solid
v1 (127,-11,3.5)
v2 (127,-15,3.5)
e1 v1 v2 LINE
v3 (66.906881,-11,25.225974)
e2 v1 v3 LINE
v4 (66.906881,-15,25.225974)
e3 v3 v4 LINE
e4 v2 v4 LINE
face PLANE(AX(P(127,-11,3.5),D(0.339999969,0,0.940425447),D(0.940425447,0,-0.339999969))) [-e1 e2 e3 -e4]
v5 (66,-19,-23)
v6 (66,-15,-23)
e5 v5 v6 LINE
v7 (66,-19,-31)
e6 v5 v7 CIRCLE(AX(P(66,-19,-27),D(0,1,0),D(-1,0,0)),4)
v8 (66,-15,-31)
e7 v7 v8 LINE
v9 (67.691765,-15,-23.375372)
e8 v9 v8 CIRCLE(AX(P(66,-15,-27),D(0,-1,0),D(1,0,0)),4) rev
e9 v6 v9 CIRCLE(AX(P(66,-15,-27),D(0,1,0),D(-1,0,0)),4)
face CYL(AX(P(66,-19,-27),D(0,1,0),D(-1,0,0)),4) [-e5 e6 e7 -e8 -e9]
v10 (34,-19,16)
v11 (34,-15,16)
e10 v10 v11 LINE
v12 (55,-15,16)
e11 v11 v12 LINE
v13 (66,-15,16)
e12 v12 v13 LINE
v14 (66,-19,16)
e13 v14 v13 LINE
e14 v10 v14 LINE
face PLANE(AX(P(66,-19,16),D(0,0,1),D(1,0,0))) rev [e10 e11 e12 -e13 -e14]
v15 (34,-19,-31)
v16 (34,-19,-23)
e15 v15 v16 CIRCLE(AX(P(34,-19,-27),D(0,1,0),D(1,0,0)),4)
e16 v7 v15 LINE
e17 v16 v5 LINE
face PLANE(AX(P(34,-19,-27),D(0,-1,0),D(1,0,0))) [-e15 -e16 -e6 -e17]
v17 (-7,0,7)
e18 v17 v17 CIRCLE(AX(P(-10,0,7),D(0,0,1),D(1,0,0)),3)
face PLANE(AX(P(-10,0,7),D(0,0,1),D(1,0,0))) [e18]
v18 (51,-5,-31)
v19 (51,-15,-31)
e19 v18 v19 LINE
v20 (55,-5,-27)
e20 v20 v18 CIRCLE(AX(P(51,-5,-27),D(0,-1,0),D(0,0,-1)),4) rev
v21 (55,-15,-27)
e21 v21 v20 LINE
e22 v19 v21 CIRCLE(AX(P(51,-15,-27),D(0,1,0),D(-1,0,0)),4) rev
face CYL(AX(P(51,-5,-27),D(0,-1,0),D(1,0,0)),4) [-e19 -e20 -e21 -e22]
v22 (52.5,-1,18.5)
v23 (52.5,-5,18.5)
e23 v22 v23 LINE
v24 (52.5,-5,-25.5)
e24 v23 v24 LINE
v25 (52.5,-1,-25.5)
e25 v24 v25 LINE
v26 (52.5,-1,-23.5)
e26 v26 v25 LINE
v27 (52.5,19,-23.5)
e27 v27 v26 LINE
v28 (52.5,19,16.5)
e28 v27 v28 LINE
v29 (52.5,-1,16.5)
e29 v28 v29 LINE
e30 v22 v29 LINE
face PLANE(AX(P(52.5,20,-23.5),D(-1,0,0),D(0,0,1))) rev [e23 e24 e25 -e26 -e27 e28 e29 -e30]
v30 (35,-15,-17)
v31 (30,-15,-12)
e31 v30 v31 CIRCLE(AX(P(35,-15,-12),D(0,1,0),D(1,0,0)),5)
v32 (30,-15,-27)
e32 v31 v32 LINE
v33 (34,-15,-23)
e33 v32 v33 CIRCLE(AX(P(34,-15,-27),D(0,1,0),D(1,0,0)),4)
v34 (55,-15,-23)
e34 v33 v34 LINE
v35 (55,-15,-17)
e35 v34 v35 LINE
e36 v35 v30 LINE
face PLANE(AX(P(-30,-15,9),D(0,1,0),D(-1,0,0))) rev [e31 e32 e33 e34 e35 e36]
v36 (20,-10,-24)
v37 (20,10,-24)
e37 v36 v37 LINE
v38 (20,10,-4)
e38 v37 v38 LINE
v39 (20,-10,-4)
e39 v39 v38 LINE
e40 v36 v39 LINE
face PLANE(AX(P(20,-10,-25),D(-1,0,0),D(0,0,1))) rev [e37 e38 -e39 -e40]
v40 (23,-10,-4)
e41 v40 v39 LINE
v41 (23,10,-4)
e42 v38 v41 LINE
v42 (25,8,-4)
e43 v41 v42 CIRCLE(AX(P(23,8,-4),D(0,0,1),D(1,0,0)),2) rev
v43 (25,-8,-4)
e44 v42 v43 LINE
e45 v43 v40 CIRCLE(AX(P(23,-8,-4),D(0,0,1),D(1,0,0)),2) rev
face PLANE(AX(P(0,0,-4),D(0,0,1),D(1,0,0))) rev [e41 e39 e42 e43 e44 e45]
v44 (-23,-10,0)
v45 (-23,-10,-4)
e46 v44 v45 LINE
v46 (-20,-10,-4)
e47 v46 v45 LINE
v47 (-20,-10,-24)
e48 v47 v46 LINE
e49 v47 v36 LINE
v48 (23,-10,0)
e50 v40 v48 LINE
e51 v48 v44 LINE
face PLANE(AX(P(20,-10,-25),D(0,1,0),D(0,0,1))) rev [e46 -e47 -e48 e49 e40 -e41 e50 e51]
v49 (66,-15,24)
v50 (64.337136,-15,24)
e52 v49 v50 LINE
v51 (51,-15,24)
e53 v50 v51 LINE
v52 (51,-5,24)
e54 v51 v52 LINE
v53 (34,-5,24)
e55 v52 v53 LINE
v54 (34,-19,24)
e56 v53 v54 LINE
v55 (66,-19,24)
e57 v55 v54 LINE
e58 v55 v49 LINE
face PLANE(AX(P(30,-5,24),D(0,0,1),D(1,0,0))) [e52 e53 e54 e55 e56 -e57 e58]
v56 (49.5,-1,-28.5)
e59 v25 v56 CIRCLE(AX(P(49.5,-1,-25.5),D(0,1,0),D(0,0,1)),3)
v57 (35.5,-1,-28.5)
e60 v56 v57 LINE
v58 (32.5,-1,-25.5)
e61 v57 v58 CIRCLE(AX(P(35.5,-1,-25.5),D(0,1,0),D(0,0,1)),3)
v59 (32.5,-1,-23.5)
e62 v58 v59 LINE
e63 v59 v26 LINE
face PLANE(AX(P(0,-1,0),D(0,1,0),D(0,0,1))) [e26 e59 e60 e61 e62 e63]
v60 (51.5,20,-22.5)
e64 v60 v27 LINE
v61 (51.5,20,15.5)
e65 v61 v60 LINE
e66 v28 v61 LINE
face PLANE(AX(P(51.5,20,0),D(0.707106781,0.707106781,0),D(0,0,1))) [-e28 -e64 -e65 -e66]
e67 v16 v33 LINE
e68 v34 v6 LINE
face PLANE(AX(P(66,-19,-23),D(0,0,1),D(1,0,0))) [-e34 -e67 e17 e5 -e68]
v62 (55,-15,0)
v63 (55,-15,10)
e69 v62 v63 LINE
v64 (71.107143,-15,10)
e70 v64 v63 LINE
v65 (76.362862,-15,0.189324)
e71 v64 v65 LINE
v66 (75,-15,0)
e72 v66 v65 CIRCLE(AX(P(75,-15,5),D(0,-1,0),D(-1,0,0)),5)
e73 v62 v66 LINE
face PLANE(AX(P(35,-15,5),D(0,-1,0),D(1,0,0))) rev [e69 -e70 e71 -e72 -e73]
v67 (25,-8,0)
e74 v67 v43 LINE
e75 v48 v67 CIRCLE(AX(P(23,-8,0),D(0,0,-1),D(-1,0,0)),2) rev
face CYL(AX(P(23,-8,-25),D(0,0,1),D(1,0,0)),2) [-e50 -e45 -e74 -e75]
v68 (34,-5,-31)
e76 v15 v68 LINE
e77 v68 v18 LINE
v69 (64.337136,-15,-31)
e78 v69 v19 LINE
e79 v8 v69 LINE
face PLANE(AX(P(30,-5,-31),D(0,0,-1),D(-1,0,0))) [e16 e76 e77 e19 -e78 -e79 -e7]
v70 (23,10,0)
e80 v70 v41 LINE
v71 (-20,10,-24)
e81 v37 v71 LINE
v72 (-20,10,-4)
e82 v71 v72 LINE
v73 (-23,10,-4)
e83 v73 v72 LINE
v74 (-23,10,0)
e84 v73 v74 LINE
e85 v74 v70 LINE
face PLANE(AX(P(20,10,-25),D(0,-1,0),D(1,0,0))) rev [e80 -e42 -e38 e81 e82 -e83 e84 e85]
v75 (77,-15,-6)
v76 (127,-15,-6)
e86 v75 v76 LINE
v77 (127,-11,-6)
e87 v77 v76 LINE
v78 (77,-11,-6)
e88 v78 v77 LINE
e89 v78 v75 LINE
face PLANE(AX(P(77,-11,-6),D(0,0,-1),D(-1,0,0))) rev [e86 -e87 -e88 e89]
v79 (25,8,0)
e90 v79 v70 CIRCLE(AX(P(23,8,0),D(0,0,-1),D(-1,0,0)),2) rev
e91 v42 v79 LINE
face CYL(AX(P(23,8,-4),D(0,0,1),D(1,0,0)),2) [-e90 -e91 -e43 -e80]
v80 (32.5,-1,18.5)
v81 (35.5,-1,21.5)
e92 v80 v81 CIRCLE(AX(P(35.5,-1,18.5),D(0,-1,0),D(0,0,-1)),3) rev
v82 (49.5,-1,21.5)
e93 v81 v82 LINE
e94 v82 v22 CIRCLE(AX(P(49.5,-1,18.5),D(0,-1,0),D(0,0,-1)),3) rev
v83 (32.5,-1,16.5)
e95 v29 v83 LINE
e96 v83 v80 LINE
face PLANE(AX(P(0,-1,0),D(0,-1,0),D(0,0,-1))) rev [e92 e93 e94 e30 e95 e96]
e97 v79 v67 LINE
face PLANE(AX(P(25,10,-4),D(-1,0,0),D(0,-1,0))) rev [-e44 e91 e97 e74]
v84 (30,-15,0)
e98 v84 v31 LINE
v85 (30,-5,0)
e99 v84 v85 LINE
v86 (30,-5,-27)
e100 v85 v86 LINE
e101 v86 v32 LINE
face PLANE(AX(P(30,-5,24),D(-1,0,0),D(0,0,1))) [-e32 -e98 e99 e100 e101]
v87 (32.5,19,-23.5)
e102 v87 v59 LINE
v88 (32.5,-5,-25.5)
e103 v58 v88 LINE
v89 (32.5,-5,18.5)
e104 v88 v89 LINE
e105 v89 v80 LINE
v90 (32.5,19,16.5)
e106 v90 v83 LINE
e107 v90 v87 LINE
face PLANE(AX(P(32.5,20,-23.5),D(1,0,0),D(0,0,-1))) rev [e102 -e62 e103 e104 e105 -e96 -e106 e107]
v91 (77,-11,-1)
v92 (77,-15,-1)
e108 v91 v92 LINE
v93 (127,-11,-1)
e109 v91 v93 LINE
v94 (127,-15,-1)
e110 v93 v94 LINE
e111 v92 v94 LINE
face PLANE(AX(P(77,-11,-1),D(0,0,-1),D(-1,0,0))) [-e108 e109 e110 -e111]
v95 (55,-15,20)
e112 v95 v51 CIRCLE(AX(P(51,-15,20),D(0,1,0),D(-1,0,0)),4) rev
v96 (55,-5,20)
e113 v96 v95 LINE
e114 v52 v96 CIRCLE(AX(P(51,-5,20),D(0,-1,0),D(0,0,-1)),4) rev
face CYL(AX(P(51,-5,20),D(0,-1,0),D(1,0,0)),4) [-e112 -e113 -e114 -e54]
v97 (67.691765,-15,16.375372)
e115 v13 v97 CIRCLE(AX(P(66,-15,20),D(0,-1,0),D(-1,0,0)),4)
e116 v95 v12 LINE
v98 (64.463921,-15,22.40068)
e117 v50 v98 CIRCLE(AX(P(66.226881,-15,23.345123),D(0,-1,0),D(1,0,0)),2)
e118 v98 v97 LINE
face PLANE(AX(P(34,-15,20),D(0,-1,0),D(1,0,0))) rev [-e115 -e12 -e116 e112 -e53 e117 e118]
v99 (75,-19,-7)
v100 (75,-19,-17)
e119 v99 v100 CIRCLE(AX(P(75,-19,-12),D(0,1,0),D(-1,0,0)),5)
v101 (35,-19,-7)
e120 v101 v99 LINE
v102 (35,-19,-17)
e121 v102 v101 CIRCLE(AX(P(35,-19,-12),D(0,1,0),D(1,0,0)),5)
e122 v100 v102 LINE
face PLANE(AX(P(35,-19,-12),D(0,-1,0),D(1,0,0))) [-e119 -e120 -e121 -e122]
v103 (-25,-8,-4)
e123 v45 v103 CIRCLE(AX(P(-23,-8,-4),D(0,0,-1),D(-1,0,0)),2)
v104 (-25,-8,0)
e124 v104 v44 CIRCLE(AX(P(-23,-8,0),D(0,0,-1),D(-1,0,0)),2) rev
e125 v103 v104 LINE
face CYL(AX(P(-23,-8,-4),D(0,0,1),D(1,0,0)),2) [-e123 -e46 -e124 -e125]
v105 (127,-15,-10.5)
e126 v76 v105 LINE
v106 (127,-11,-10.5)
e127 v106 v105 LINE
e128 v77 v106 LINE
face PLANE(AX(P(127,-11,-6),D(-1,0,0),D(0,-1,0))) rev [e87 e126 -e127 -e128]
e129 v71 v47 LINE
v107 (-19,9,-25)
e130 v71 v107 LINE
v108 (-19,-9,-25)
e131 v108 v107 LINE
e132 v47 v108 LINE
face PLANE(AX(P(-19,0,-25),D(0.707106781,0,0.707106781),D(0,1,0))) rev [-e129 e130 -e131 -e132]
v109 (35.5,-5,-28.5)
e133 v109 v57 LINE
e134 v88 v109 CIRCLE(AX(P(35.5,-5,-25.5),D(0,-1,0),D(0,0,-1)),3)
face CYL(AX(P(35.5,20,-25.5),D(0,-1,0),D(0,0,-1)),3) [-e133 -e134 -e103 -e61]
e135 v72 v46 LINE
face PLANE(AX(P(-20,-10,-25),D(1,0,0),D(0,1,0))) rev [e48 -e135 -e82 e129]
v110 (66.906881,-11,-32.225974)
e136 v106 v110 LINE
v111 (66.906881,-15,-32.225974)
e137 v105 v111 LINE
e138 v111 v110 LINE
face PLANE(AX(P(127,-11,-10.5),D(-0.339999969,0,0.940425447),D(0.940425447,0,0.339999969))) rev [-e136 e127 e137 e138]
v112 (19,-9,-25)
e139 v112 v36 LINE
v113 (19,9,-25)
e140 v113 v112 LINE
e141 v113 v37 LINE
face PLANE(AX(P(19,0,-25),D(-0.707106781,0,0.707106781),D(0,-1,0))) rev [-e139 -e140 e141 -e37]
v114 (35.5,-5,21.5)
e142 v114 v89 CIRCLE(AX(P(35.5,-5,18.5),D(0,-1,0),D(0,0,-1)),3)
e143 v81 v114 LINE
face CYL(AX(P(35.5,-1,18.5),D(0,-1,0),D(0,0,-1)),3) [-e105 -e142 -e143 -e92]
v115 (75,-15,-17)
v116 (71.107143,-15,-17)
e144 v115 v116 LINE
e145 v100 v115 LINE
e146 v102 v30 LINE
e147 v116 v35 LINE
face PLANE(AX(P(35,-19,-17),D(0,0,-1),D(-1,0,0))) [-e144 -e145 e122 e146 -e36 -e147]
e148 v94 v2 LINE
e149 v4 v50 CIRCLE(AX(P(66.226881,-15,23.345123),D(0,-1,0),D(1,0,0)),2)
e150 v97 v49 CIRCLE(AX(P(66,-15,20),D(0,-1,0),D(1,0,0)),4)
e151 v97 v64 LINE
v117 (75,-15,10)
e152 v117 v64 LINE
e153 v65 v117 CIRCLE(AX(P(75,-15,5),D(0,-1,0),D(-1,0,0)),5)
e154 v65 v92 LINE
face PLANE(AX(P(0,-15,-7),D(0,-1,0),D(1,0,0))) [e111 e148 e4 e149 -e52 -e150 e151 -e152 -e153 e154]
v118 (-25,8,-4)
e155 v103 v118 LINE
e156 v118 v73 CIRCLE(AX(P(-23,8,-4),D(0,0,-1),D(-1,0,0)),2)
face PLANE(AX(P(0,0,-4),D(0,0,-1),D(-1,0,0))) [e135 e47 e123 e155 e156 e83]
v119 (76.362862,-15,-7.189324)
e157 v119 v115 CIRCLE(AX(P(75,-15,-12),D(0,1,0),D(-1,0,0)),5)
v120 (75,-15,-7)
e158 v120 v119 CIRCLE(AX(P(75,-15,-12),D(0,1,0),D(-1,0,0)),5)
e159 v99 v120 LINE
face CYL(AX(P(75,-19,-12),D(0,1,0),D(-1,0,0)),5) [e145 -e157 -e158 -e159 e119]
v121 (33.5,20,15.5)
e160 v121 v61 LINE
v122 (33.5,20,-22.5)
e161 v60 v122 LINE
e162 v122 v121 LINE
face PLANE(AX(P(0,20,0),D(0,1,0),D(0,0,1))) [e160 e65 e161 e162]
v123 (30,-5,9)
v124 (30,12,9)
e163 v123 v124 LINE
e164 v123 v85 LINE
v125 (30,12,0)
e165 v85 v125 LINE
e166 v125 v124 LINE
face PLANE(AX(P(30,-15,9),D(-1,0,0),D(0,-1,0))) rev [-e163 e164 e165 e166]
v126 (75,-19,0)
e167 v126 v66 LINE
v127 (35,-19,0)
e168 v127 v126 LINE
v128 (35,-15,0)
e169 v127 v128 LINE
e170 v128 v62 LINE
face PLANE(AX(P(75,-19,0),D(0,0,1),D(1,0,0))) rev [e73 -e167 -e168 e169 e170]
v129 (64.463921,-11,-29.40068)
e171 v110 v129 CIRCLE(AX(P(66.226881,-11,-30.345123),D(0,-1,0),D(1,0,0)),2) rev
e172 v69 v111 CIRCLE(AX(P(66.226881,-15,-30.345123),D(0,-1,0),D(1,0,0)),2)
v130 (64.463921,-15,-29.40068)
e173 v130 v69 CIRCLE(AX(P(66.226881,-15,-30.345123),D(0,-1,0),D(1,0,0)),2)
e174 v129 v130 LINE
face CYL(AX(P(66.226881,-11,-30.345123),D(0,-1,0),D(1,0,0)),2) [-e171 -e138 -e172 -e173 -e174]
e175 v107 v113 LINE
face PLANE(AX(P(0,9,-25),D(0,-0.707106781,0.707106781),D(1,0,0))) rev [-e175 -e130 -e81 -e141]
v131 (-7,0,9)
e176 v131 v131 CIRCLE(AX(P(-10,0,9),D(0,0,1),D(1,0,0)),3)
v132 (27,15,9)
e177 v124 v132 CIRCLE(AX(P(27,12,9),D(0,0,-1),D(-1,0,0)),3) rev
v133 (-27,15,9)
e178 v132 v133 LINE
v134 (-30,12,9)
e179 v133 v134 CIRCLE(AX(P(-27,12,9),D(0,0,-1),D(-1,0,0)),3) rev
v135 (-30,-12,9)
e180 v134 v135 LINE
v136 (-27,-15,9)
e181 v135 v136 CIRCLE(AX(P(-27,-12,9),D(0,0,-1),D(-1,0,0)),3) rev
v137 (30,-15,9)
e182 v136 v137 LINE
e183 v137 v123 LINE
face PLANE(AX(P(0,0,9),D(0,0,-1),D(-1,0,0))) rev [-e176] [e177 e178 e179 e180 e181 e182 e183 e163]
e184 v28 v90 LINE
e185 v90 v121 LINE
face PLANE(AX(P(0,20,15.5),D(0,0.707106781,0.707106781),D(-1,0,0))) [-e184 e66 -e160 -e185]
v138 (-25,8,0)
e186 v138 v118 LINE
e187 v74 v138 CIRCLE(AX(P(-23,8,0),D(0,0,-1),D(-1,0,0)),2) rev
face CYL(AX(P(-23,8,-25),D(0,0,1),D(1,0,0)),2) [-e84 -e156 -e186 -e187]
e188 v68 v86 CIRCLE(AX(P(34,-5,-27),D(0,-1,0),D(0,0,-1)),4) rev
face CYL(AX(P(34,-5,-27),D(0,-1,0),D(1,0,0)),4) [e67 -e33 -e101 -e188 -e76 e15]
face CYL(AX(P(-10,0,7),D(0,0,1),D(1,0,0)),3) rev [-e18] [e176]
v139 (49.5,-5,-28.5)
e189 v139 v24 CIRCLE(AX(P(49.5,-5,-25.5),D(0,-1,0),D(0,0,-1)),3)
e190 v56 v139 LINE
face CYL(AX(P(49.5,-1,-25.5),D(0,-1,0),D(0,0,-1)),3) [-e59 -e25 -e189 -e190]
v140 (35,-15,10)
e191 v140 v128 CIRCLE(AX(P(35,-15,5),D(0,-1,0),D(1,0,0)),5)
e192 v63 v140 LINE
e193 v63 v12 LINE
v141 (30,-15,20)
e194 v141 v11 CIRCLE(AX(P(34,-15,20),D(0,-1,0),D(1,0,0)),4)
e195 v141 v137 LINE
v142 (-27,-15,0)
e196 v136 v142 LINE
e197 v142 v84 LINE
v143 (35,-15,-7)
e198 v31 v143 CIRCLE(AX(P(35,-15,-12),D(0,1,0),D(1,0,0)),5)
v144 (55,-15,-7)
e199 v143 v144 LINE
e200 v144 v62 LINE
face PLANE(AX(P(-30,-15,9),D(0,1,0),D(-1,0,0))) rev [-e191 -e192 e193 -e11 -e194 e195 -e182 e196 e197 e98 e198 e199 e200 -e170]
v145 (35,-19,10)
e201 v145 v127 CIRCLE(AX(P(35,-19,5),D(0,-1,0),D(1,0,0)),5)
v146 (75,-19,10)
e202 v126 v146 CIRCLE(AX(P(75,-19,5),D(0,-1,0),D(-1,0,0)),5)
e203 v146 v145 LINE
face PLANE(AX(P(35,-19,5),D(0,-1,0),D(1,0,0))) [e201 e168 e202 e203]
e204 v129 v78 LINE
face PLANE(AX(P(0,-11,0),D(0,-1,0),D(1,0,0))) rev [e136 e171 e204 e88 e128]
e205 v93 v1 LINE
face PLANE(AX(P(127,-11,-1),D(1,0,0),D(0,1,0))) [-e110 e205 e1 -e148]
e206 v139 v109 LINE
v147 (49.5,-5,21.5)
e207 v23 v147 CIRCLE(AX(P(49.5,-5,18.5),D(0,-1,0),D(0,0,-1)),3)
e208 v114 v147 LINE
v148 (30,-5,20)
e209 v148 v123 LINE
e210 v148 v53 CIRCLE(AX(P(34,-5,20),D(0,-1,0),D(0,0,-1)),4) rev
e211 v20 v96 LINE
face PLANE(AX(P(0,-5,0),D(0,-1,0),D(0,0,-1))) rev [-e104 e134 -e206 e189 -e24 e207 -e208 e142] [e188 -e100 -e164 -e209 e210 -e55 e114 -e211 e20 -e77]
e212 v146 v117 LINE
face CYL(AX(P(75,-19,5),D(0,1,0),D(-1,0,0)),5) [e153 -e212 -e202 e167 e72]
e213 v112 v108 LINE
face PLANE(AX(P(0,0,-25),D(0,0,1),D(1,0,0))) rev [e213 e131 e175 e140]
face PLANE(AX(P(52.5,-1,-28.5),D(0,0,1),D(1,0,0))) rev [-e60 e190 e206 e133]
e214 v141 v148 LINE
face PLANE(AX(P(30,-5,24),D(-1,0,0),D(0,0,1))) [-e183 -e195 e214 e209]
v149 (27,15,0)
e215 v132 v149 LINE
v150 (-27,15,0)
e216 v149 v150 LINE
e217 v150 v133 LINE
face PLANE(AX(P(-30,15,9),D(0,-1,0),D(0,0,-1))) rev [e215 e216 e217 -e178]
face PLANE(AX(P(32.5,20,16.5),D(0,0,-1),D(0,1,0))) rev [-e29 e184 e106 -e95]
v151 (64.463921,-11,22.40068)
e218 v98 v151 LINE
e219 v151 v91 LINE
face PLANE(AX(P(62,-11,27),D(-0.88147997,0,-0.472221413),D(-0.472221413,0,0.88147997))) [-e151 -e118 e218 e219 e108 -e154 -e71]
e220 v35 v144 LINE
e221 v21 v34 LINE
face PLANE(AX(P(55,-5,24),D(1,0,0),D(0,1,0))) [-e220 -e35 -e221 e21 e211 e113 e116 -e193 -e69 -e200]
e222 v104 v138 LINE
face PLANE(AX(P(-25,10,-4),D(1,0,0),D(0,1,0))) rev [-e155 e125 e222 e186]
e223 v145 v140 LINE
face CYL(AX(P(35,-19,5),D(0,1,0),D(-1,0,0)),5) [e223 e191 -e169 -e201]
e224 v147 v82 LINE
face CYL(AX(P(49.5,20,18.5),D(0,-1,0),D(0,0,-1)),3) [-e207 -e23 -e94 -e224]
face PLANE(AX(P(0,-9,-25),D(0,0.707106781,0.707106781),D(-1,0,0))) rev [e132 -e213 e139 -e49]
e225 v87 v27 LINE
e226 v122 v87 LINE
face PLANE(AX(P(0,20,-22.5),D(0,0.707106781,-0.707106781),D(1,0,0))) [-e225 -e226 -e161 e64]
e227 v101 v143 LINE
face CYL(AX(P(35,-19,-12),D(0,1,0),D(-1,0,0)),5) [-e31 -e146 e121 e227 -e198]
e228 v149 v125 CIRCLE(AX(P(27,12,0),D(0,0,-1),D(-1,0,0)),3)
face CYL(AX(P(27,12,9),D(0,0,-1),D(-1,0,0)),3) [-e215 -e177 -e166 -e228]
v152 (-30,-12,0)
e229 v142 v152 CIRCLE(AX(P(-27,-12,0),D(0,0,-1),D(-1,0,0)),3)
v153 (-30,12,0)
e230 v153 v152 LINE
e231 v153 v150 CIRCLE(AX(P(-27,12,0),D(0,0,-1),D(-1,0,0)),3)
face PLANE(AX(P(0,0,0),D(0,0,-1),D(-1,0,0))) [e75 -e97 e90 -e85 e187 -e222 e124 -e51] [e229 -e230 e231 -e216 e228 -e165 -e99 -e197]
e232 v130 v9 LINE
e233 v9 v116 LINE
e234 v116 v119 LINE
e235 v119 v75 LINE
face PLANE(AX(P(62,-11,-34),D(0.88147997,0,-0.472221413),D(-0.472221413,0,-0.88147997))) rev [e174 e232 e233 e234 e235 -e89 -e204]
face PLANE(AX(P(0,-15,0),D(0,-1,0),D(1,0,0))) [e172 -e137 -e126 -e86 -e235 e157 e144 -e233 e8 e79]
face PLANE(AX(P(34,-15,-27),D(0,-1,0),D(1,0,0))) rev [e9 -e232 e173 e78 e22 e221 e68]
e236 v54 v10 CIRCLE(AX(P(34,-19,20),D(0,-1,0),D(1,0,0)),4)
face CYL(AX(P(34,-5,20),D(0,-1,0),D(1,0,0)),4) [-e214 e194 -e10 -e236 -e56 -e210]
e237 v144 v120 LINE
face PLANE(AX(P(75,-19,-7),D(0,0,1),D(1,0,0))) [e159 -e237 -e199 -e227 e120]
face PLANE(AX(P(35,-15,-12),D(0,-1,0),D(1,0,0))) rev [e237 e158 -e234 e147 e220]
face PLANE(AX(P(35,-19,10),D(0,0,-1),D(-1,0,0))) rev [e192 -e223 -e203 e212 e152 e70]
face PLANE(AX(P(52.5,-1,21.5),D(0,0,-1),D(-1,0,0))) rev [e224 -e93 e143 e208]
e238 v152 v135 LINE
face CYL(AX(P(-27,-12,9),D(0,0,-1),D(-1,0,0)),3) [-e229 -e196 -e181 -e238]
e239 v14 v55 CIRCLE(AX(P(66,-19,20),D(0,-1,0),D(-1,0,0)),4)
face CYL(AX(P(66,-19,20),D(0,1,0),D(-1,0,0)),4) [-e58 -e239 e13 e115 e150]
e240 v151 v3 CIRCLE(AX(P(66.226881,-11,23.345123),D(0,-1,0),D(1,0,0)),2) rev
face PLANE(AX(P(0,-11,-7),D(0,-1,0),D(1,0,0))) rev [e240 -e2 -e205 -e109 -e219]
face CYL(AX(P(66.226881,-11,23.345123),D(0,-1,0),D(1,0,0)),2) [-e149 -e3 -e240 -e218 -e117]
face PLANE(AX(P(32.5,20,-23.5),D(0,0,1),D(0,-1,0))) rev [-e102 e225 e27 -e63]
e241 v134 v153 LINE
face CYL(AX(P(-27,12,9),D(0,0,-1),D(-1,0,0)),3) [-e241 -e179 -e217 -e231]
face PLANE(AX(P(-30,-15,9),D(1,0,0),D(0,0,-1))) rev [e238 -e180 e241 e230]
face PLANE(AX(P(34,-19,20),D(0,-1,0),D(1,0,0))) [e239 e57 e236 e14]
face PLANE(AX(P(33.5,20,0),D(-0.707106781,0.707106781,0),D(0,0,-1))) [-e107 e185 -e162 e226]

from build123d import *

# Parameters (mm, degrees)
SKETCH_1_W          = 60
SKETCH_1_H          = 30
EXTRUDE_1_DEPTH     = 9
SKETCH_2_W          = 25
SKETCH_2_H          = 55
EXTRUDE_2_DEPTH     = 10
SKETCH_3_W          = 20
SKETCH_3_H          = 40
EXTRUDE_3_DEPTH     = 25
SKETCH_4_W          = 20
SKETCH_4_H          = 5
EXTRUDE_4_DEPTH     = 4
FILLET_1_R          = 4
FILLET_2_R          = 3
FILLET_3_R          = 3
EXTRUDE_5_DEPTH     = 4
EXTRUDE_6_DEPTH     = 4
FILLET_4_R          = 2
CHAMFER_1_SIZE      = 1
SKETCH_7_W          = 40
SKETCH_7_H          = 20
EXTRUDE_7_DEPTH     = 25
SKETCH_8_W          = 5
SKETCH_8_H          = 20
EXTRUDE_8_DEPTH     = 4
CHAMFER_2_SIZE      = 1
FILLET_6_R          = 2
SKETCH_9_R          = 3
CUT_EXTRUDE_1_DEPTH = 2


with BuildPart() as part:
    # 草图1 → 凸台-拉伸1 (new body)
    with BuildSketch(Plane.XY):
        Rectangle(SKETCH_1_W, SKETCH_1_H)
    extrude(amount=EXTRUDE_1_DEPTH)

    # 草图2 → 凸台-拉伸2 (add)
    with BuildSketch(Plane.XZ.offset(15)):
        with Locations((42.5, -3.5)):
            Rectangle(SKETCH_2_W, SKETCH_2_H)
    extrude(amount=-EXTRUDE_2_DEPTH)

    # 草图3 → 凸台-拉伸3 (add)
    with BuildSketch(Plane(origin=(0, -5, 0), x_dir=(1, 0, 0), z_dir=(0, 1, 0))):
        with Locations((42.5, 3.5)):
            Rectangle(SKETCH_3_W, SKETCH_3_H)
    extrude(amount=EXTRUDE_3_DEPTH)

    # 草图4 → 凸台-拉伸4 (add)
    with BuildSketch(Plane(origin=(0, -5, 0), x_dir=(1, 0, 0), z_dir=(0, 1, 0))):
        with Locations((42.5, 26)):
            Rectangle(SKETCH_4_W, SKETCH_4_H)
        with Locations((42.5, -19)):
            Rectangle(SKETCH_4_W, SKETCH_4_H)
    extrude(amount=EXTRUDE_4_DEPTH)

    # 圆角1
    fillet_1_edges = [part.edges().sort_by_distance(p)[0] for p in [
        (30, -10, -31),
        (30, -10, 24),
        (55, -10, 24),
        (55, -10, -31),
    ]]
    fillet(fillet_1_edges, radius=FILLET_1_R)

    # 圆角2
    fillet_2_edges = [part.edges().sort_by_distance(p)[0] for p in [
        (52.5, -3, -28.5),
        (32.5, -3, -28.5),
        (52.5, -3, 21.5),
        (32.5, -3, 21.5),
    ]]
    fillet(fillet_2_edges, radius=FILLET_2_R)

    # 圆角3
    fillet_3_edges = [part.edges().sort_by_distance(p)[0] for p in [
        (-30, -15, 4.5),
        (-30, 15, 4.5),
        (30, 15, 4.5),
    ]]
    fillet(fillet_3_edges, radius=FILLET_3_R)

    # 草图5 → 凸台-拉伸5 (add)
    with BuildSketch(Plane.XZ.offset(15)):
        with BuildLine():
            Line((34, 24), (66, 24))
            ThreePointArc((66, 24), (70, 20), (66, 16))
            Line((66, 16), (34, 16))
            ThreePointArc((34, 16), (30, 20), (34, 24))
        make_face()
        with BuildLine():
            Line((35, 10), (75, 10))
            ThreePointArc((75, 10), (80, 5), (75, 0))
            Line((75, 0), (35, 0))
            ThreePointArc((35, 0), (30, 5), (35, 10))
        make_face()
    extrude_5 = extrude(amount=EXTRUDE_5_DEPTH)

    # 镜向1: 凸台-拉伸5 across plane
    add(extrude_5.mirror(Plane(origin=(0, 0, -3.5), x_dir=(1, 0, 0), z_dir=(0, 0, -1))))

    # 草图6 → 凸台-拉伸6 (add)
    with BuildSketch(Plane(origin=(0, -15, 0), x_dir=(1, 0, 0), z_dir=(0, 1, 0))):
        Polygon((62, 34), (77, 6), (127, 6), (127, 10.5), align=None)
    extrude_6 = extrude(amount=EXTRUDE_6_DEPTH)

    # 镜向2: 凸台-拉伸6 across plane
    add(extrude_6.mirror(Plane(origin=(0, 0, -3.5), x_dir=(1, 0, 0), z_dir=(0, 0, -1))))

    # 圆角4
    # the kernel refuses this fillet: 2 mm, written as the material it takes off along each edge
    with BuildSketch(Plane(origin=(62, -15, -34), x_dir=(0.47222141251542, 0, 0.8814799700287814), z_dir=(0, 1, 0))) as fillet_4_piece_1:
        with BuildLine():
            CenterArc((FILLET_4_R * 2.60886248276, FILLET_4_R), FILLET_4_R, 131.944537695, 138.055462305)
            Line((FILLET_4_R * 1.94045155385, FILLET_4_R * 1.74379219551), (0, 0))
            Line((0, 0), (FILLET_4_R * 2.60886248276, 0))
        make_face()
    extrude(amount=17.044312414, mode=Mode.SUBTRACT)
    with BuildSketch(Plane(origin=(62, -15, 27), x_dir=(0.47222141251541977, 0, -0.8814799700287816), z_dir=(0, 1, 0))) as fillet_4_piece_2:
        with BuildLine():
            CenterArc((FILLET_4_R * 2.60886248276, -FILLET_4_R), FILLET_4_R, 90, 138.055462305)
            Line((FILLET_4_R * 1.94045155385, -FILLET_4_R * 1.74379219551), (0, 0))
            Line((0, 0), (FILLET_4_R * 2.60886248276, 0))
        make_face()
    extrude(amount=17.044312414, mode=Mode.SUBTRACT)

    # 倒角1
    chamfer_1_edges = [part.edges().sort_by_distance(p)[0] for p in [
        (32.5, 20, -3.5),
        (42.5, 20, 16.5),
        (52.5, 20, -3.5),
        (42.5, 20, -23.5),
    ]]
    chamfer(chamfer_1_edges, length=CHAMFER_1_SIZE)

    # 草图7 → 凸台-拉伸7 (add)
    with BuildSketch(Plane(origin=(0, 0, 0), x_dir=(-1, 0, 0), z_dir=(0, 0, -1))):
        Rectangle(SKETCH_7_W, SKETCH_7_H)
    extrude(amount=EXTRUDE_7_DEPTH)

    # 草图8 → 凸台-拉伸8 (add)
    with BuildSketch(Plane(origin=(0, 0, 0), x_dir=(-1, 0, 0), z_dir=(0, 0, -1))):
        with Locations((22.5, 0)):
            Rectangle(SKETCH_8_W, SKETCH_8_H)
        with Locations((-22.5, 0)):
            Rectangle(SKETCH_8_W, SKETCH_8_H)
    extrude(amount=EXTRUDE_8_DEPTH)

    # 倒角2
    chamfer_2_edges = [part.edges().sort_by_distance(p)[0] for p in [
        (-20, 0, -25),
        (0, 10, -25),
        (20, 0, -25),
        (0, -10, -25),
    ]]
    chamfer(chamfer_2_edges, length=CHAMFER_2_SIZE)

    # 圆角6
    fillet_6_edges = [part.edges().sort_by_distance(p)[0] for p in [
        (-25, -10, -2),
        (-25, 10, -2),
        (25, 10, -2),
        (25, -10, -2),
    ]]
    fillet(fillet_6_edges, radius=FILLET_6_R)

    # 草图9 → 切除-拉伸1 (cut)
    with BuildSketch(Plane.XY.offset(9)):
        with Locations((-10, 0)):
            Circle(SKETCH_9_R)
    extrude(amount=-CUT_EXTRUDE_1_DEPTH, mode=Mode.SUBTRACT)


solid = part.part
